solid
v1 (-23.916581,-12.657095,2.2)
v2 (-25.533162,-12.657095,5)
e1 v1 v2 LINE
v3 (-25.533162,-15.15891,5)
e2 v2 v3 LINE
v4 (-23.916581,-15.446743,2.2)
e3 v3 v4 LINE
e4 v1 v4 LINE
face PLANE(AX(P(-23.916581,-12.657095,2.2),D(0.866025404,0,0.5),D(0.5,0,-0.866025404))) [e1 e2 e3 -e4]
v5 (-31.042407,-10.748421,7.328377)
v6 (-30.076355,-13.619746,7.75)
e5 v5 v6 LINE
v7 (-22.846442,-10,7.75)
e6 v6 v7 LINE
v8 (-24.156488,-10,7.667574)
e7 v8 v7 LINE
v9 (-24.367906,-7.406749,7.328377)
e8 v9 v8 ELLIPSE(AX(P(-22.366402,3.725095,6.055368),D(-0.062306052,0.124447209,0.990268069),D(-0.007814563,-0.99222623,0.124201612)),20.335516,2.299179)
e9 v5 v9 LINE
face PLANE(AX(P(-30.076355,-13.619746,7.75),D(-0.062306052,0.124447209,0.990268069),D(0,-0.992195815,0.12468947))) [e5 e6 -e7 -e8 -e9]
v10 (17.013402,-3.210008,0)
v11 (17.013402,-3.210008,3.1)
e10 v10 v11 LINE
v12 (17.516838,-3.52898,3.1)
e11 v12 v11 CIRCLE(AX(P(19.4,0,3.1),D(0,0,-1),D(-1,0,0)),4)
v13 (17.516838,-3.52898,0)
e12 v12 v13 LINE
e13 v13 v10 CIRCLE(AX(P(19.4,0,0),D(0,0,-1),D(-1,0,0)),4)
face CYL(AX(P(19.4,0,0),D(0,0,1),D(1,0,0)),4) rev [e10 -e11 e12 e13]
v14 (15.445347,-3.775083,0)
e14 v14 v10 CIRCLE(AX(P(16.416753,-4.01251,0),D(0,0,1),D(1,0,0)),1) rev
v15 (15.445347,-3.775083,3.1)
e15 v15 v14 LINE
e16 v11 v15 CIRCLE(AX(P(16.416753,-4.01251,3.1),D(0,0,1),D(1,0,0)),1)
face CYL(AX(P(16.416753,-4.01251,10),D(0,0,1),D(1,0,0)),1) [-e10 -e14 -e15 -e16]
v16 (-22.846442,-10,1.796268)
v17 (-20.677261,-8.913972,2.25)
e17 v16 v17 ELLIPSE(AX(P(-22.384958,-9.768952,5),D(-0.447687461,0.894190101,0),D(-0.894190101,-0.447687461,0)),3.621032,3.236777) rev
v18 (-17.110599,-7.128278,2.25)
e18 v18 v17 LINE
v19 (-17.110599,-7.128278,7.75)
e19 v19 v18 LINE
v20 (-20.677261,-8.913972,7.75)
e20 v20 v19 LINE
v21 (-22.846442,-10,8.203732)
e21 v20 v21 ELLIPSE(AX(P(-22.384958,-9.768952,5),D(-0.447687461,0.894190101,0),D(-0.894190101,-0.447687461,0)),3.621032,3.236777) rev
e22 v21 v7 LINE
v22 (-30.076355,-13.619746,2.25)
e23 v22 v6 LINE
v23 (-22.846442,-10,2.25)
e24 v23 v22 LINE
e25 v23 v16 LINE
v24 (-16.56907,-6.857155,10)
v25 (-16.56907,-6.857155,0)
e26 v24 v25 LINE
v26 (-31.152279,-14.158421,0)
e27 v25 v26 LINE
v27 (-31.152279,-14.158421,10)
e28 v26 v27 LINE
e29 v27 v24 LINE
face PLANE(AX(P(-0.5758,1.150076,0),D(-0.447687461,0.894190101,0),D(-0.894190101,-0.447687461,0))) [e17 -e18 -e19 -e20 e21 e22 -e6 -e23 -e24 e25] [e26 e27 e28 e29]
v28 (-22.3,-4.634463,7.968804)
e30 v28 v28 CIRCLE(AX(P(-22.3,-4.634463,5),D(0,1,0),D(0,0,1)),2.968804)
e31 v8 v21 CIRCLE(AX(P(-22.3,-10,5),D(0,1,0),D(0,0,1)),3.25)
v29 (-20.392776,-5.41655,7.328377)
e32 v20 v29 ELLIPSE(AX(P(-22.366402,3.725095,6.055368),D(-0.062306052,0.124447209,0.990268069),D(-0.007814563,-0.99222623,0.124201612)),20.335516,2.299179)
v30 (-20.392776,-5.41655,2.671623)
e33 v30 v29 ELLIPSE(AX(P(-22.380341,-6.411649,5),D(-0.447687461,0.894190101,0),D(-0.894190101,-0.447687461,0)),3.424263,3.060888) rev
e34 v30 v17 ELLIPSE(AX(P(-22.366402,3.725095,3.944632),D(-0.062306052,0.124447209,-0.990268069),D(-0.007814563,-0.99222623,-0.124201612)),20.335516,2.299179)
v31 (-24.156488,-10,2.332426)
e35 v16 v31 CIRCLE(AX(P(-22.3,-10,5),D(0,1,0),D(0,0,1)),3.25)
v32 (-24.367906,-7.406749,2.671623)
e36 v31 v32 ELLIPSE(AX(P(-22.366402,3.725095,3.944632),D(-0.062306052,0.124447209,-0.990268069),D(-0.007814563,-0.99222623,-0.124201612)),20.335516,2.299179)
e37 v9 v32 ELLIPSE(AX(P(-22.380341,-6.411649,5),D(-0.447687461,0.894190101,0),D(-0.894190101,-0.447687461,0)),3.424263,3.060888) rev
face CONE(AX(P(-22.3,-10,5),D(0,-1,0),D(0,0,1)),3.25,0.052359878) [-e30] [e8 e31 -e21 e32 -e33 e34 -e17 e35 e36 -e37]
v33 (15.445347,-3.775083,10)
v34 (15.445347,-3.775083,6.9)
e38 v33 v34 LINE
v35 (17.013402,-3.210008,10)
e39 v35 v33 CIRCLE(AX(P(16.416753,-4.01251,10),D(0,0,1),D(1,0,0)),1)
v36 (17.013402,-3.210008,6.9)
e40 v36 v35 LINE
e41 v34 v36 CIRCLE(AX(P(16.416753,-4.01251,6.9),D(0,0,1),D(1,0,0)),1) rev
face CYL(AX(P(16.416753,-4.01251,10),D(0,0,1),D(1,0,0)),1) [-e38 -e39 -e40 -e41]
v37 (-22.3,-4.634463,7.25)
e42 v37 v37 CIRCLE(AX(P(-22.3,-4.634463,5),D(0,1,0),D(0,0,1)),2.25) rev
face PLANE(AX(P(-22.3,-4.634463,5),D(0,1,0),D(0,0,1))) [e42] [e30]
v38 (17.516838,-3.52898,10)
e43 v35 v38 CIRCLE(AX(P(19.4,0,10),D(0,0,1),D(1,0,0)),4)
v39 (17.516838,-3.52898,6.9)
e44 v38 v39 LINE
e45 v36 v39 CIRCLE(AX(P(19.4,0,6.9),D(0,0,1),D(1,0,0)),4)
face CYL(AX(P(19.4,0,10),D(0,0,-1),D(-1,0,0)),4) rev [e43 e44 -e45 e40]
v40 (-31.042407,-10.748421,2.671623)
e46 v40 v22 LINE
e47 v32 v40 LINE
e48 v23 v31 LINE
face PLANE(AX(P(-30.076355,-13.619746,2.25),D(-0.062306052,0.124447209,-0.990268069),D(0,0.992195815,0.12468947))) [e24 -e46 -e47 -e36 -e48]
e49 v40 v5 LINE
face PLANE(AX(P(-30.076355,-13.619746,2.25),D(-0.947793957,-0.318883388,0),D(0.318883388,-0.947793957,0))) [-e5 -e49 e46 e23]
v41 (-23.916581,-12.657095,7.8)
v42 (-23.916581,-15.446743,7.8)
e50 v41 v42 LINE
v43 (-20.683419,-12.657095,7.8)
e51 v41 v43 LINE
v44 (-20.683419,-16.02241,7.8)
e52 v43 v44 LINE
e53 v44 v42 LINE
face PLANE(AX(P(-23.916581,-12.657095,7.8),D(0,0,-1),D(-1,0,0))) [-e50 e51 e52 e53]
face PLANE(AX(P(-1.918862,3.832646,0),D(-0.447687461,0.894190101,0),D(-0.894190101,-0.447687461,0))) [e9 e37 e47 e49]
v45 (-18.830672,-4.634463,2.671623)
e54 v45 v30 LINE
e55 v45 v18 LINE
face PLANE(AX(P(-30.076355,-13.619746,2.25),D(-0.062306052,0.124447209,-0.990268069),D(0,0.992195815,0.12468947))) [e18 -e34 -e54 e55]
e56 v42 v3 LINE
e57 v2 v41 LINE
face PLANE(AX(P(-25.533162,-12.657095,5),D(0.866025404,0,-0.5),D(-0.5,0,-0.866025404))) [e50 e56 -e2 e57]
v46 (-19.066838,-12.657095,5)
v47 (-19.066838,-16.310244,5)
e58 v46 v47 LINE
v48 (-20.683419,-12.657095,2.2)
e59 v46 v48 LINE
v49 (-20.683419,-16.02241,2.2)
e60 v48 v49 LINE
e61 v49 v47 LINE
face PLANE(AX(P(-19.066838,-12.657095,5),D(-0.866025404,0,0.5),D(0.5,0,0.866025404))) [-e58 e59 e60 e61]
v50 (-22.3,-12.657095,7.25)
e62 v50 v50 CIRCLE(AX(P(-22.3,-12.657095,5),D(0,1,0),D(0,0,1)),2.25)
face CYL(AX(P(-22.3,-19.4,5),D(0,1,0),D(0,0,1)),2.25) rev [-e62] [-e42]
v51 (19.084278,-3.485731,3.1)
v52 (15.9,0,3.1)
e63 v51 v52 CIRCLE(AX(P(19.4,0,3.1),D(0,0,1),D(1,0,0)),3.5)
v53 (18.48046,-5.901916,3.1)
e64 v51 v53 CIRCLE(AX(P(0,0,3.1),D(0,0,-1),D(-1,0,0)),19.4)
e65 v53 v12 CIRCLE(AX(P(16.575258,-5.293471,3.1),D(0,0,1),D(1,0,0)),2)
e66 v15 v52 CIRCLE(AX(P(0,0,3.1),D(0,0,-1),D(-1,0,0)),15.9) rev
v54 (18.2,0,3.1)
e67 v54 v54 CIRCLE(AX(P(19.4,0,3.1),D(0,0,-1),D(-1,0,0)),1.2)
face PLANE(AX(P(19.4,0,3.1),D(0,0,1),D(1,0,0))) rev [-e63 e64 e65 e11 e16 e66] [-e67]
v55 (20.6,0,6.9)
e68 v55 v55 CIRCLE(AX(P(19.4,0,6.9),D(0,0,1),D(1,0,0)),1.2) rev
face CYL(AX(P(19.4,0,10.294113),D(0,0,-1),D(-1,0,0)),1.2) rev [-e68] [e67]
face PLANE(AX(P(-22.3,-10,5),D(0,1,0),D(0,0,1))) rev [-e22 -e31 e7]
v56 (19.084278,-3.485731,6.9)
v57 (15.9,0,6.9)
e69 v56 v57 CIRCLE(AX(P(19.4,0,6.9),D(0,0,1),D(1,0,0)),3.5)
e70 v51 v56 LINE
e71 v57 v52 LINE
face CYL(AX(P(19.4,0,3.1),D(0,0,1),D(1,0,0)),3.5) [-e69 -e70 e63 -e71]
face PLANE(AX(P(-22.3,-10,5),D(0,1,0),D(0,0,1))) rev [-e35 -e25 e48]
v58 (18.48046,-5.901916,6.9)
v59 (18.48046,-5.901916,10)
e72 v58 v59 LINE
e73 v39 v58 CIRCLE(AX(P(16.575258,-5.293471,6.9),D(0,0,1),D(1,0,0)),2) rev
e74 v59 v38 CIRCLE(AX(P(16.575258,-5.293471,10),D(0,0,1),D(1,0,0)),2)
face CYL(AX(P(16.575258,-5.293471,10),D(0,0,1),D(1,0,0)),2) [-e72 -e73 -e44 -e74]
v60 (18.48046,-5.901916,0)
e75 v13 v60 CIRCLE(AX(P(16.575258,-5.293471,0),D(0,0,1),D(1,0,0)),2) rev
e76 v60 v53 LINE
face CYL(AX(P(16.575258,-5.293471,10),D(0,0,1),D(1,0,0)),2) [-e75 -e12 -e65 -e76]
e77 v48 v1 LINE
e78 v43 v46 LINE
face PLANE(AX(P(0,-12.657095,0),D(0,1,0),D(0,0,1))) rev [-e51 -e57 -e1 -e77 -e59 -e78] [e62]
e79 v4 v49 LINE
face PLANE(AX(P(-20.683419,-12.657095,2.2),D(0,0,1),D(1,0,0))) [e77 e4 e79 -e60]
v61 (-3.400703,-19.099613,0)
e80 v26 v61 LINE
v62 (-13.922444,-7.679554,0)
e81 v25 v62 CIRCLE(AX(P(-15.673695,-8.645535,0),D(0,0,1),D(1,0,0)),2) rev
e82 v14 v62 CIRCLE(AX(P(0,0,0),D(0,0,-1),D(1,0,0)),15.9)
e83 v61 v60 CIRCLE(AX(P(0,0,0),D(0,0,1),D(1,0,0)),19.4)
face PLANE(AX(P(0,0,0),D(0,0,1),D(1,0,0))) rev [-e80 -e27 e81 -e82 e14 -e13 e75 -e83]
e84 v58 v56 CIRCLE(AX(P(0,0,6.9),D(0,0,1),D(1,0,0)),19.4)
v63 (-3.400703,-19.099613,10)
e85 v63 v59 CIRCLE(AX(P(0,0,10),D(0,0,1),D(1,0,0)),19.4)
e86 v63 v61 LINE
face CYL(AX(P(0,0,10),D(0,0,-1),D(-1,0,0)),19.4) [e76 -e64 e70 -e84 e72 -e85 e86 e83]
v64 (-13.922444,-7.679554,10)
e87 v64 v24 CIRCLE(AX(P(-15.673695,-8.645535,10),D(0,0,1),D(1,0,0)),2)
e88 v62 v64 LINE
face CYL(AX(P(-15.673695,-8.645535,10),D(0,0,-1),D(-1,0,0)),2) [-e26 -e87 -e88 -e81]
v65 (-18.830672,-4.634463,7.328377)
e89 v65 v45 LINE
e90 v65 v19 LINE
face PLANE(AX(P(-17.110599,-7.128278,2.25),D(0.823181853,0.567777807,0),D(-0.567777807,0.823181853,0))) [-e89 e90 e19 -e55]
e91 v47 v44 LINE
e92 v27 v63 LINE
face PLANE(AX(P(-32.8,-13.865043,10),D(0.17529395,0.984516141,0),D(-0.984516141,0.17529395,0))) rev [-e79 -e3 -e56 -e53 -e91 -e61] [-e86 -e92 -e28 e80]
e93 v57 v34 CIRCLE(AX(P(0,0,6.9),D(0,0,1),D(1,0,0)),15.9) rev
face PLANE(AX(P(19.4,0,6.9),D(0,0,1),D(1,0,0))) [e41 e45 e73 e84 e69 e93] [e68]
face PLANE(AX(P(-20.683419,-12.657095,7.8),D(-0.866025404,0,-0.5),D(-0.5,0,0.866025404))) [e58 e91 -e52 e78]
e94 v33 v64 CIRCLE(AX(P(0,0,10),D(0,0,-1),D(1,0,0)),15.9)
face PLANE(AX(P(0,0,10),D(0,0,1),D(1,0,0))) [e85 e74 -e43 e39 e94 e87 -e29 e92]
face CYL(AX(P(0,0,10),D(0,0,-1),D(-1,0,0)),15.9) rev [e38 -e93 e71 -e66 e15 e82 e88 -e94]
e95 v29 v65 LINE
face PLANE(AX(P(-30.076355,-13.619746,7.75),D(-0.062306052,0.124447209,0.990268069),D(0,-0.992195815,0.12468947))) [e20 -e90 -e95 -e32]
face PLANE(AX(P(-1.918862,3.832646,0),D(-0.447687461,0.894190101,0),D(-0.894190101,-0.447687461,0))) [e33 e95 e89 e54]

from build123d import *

# Parameters (mm, degrees)
BOSS_EXTRUDE1_DEPTH      = 10
BOSS_EXTRUDE2_DEPTH      = 1.9
BOSS_EXTRUDE2_DEPTH_BACK = 1.9
SKETCH2_R                = 3.5
SKETCH3_R                = 4
CUT_EXTRUDE1_DEPTH       = 39.727380495
SKETCH4_R                = 4
CUT_EXTRUDE2_DEPTH       = 39.727380495
SKETCH5_R                = 1.2
CUT_EXTRUDE3_DEPTH       = 3.8
SKETCH9_W                = 19.801856387
SKETCH9_H                = 10
CUT_EXTRUDE4_DEPTH       = 1
SKETCH12_W               = 14.5
SKETCH12_H               = 5.5
BOSS_EXTRUDE3_DEPTH      = 3
BOSS_EXTRUDE3_TAPER      = 8
SKETCH10_R               = 2.25
CUT_EXTRUDE5_DEPTH       = 37.680126397
FILLET1_R                = 2
FILLET2_R                = 1
CUT_EXTRUDE7_DEPTH       = 7.342905


# Read off the part's stored shape, not the designer's step: Boss-Extrude4
with BuildPart() as part:
    # Sketch1 → Boss-Extrude1 (new body)
    with BuildSketch(Plane.XY):
        with BuildLine():
            Line((-15.093376031, -5), (-32.8, -13.865042807))
            Line((-32.8, -13.865042807), (-3.400702634, -19.099613127))
            ThreePointArc((-3.400702634, -19.099613127), (12.457655656, -14.871678303), (19.4, 0))
            Line((19.4, 0), (15.9, 0))
            ThreePointArc((15.9, 0), (2.532323154, -15.697048749), (-15.093376031, -5))
        make_face()
    extrude(amount=BOSS_EXTRUDE1_DEPTH)

    # Sketch2 → Boss-Extrude2 (add, two sides: drawn at the far end of the back side and taken through both)
    with BuildSketch(Plane.XY.offset(5).offset(-BOSS_EXTRUDE2_DEPTH_BACK)):
        with Locations((19.4, 0)):
            Circle(SKETCH2_R)
    extrude(amount=BOSS_EXTRUDE2_DEPTH + BOSS_EXTRUDE2_DEPTH_BACK)

    # Sketch3 → Cut-Extrude1 (cut, through all)
    with BuildSketch(Plane.XY.offset(6.9)):
        with Locations((19.4, 0)):
            Circle(SKETCH3_R)
    extrude(amount=CUT_EXTRUDE1_DEPTH, mode=Mode.SUBTRACT)

    # Sketch4 → Cut-Extrude2 (cut, through all)
    with BuildSketch(Plane(origin=(0, 0, 3.1), x_dir=(-1, 0, 0), z_dir=(0, 0, -1))):
        with Locations((-19.4, 0)):
            Circle(SKETCH4_R)
    extrude(amount=CUT_EXTRUDE2_DEPTH, mode=Mode.SUBTRACT)

    # Sketch5 → Cut-Extrude3 (cut)
    with BuildSketch(Plane(origin=(0, 0, 3.1), x_dir=(-1, 0, 0), z_dir=(0, 0, -1))):
        with Locations((-19.4, 0)):
            Circle(SKETCH5_R)
    extrude(amount=-CUT_EXTRUDE3_DEPTH, mode=Mode.SUBTRACT)

    # Sketch9 → Cut-Extrude4 (cut)
    with BuildSketch(Plane(origin=(-1.023487263, 2.044265831, 0), x_dir=(0.8941901013439871, 0.4476874609126664, 0), z_dir=(-0.4476874609126664, 0.8941901013439871, 0))):
        with Locations((-25.63571294, -5)):
            Rectangle(SKETCH9_W, SKETCH9_H)
    extrude(amount=-CUT_EXTRUDE4_DEPTH, mode=Mode.SUBTRACT)

    # Sketch12 → Boss-Extrude3 (add)
    with BuildSketch(Plane(origin=(-0.575799802, 1.15007573, 0), x_dir=(0.894190101343987, 0.44768746091266626, 0), z_dir=(-0.4476874609126663, 0.8941901013439871, 0))):
        with Locations((-25.74136864, -5)):
            Rectangle(SKETCH12_W, SKETCH12_H)
    extrude(amount=BOSS_EXTRUDE3_DEPTH, taper=BOSS_EXTRUDE3_TAPER)

    # Boss-Extrude4 outline → Boss-Extrude4 (revolve)
    with BuildSketch(Plane(origin=(-22.3, 0, 5), x_dir=(1, 0, 0), z_dir=(0, 0, 1))):
        Polygon((0, -10), (3.25, -10), (2.968804119, -4.634462949), (0, -4.634462949), align=None)
    revolve(axis=Axis((-22.3, 0, 5), (0, 1, 0)))

    # Sketch10 → Cut-Extrude5 (cut, through all)
    with BuildSketch(Plane(origin=(-1.672257199, 0, 0), x_dir=(1, 0, 0), z_dir=(0, -1, 0))):
        with Locations(Location((-20.627742801, 5, 0), (0, 0, 90))):
            Circle(SKETCH10_R)
    extrude(amount=CUT_EXTRUDE5_DEPTH, mode=Mode.SUBTRACT)

    # Fillet1
    fillet1_edges = [part.edges().sort_by_distance(p)[0] for p in [
        (18.987628866, -3.978686975, 8.45),
        (18.987628866, -3.978686975, 1.55),
        (-14.746830764, -5.944828206, 5),
    ]]
    fillet(fillet1_edges, radius=FILLET1_R)

    # Fillet2
    fillet2_edges = [part.edges().sort_by_distance(p)[0] for p in [
        (15.803350515, -1.750460649, 8.45),
        (15.803350515, -1.750460649, 1.55),
    ]]
    fillet(fillet2_edges, radius=FILLET2_R)

    # Sketch15 → Cut-Extrude7 (cut)
    with BuildSketch(Plane(origin=(0, -20, 0), x_dir=(1, 0, 0), z_dir=(0, 1, 0))):
        Polygon((-19.066838493, -5), (-20.683419246, -2.2), (-23.916580754, -2.2), (-25.533161507, -5), (-23.916580754, -7.8), (-20.683419246, -7.8), align=None)
    extrude(amount=CUT_EXTRUDE7_DEPTH, mode=Mode.SUBTRACT)


solid = part.part
